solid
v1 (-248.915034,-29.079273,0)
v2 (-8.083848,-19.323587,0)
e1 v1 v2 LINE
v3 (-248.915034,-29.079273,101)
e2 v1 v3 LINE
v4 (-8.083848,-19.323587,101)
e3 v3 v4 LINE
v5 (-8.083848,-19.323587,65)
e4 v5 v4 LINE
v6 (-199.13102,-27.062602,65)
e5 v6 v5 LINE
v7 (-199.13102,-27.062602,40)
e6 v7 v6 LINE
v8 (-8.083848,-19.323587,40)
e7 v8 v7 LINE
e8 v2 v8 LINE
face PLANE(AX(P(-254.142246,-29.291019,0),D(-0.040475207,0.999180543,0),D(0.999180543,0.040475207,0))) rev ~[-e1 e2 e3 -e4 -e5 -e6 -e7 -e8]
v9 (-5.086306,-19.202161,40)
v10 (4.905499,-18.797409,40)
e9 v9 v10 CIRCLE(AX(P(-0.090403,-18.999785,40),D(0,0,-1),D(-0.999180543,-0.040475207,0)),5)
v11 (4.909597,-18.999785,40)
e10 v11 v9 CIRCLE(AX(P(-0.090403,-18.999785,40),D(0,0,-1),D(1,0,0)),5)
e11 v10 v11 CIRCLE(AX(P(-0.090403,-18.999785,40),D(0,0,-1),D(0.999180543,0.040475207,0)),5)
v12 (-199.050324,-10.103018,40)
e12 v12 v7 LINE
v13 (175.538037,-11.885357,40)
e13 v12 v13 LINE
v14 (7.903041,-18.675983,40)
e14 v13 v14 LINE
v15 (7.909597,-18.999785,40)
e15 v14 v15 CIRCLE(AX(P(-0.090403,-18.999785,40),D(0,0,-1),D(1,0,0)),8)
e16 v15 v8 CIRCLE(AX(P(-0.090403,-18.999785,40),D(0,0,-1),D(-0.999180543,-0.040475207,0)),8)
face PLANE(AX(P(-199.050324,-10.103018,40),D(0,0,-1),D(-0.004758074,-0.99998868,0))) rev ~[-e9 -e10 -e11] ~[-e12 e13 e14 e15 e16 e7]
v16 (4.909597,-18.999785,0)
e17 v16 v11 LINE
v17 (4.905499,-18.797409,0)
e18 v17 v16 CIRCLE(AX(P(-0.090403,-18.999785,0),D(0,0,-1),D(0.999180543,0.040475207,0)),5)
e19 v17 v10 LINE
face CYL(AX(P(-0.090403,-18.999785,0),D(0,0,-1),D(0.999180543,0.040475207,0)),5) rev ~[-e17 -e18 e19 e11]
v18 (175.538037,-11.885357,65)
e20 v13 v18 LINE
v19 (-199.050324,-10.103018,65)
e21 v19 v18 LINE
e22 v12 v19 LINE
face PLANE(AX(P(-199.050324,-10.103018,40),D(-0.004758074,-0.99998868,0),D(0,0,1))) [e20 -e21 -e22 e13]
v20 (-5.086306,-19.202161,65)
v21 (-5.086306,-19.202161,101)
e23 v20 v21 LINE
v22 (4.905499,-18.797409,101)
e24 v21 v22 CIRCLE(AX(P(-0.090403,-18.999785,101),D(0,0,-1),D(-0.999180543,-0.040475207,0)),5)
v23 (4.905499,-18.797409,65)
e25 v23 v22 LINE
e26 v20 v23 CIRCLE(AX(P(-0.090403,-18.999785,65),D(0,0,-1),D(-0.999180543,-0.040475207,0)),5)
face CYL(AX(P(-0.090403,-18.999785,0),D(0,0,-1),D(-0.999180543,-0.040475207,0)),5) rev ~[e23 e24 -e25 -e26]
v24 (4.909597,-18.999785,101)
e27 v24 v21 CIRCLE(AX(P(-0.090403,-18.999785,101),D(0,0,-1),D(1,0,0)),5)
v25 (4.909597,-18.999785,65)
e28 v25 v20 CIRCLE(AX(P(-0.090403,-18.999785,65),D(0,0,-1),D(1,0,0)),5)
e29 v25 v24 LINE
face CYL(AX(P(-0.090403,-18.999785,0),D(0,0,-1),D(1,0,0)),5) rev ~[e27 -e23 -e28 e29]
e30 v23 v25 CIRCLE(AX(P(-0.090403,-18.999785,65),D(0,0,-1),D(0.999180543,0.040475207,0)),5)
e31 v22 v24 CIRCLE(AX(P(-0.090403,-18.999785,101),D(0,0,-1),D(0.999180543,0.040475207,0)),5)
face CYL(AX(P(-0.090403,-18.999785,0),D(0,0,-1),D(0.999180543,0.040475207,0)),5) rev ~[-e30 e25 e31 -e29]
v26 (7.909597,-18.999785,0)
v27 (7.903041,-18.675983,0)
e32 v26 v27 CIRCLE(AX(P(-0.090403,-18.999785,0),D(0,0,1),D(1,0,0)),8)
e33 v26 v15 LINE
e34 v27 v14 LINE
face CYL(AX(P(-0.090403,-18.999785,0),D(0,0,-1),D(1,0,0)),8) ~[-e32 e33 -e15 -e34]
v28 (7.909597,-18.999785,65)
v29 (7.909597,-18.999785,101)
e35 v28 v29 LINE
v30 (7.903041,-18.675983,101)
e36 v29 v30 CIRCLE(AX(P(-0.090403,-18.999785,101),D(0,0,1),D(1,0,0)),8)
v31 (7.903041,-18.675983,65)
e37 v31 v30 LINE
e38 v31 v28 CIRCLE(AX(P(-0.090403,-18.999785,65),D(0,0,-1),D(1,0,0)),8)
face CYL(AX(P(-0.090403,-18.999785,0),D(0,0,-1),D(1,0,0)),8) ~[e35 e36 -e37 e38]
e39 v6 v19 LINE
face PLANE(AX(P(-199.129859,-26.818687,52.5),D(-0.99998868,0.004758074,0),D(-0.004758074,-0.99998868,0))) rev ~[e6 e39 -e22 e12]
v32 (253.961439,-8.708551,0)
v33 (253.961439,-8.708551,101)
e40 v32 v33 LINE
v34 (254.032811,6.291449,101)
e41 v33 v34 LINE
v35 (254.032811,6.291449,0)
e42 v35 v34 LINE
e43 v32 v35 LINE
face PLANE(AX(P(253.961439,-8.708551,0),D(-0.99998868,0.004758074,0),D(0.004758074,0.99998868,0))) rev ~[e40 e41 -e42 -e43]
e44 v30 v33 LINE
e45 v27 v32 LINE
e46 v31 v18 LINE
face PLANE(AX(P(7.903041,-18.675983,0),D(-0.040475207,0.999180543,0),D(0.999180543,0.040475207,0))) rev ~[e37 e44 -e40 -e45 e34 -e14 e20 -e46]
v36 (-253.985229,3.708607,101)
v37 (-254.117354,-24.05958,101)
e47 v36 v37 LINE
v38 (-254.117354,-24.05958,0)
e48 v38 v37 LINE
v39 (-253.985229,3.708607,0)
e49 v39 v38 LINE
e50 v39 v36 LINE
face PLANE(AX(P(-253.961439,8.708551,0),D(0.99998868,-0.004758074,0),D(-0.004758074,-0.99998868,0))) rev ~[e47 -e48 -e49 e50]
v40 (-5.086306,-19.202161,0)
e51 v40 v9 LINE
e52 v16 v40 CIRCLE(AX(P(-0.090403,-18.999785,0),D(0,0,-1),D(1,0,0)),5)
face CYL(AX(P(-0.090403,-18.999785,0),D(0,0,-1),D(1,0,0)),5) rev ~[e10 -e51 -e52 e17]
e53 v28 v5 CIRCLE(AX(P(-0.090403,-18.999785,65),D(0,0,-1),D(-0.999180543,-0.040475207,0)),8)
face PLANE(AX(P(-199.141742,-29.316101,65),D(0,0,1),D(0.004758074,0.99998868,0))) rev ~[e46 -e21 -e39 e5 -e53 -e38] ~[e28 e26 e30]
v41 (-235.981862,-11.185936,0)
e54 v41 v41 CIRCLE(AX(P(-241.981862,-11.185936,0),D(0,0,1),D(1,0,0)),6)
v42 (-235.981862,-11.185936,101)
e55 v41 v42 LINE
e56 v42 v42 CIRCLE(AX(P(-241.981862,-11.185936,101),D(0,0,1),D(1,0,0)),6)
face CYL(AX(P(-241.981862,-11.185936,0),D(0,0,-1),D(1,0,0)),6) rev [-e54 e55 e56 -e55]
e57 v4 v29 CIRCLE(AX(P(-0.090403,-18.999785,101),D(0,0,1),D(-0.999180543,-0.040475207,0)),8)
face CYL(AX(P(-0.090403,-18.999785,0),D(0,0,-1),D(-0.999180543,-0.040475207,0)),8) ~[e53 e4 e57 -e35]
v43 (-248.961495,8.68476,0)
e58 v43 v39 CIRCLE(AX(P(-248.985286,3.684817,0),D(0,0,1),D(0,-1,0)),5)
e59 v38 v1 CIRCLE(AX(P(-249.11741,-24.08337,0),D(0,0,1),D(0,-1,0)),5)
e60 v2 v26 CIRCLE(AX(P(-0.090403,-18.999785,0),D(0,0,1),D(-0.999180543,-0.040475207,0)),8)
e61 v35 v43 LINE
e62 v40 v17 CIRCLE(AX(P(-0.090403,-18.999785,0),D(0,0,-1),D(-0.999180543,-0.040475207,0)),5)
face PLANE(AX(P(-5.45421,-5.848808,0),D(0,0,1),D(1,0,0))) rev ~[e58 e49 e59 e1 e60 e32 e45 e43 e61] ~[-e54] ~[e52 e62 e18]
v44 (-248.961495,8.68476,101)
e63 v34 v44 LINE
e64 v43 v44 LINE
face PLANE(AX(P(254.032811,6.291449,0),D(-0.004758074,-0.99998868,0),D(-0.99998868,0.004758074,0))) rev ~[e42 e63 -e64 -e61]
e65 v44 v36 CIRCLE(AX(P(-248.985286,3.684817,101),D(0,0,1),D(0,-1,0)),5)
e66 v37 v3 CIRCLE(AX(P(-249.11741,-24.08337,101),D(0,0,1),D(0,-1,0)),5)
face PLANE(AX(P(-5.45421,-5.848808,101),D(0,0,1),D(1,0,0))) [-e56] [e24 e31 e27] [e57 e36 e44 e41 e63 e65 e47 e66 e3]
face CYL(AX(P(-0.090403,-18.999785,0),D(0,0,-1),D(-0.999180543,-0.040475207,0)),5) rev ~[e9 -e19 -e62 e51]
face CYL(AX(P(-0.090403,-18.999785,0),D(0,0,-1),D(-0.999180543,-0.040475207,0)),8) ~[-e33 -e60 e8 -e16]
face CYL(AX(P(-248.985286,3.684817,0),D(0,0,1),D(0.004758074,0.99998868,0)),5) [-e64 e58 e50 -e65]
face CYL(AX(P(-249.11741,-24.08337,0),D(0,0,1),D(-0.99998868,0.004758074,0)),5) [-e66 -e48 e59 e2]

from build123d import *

# Parameters (mm, degrees)
F0_R     = 6
F1_DEPTH = 101
F2_R     = 5
F4_START = -55
F3_W     = 4.994883243
F3_H     = 25
F3_W_2   = 5.9151866052
F3_W_3   = 8.303230216
F4_DEPTH = 453


# Not quite as in the source:
# - a feature names something its author has since deleted; it is built from what else it names


with BuildPart() as f1:
    # F0 (on Top) → F1 (new body)
    with BuildSketch(Plane.XY):
        with BuildLine():
            Line((254.0328107559, 6.2914491919), (-253.9614388373, 8.7085508081))
            Line((-253.9614388373, 8.7085508081), (-254.1422456511, -29.2910190433))
            Line((-254.1422456511, -29.2910190433), (-8.0838477514, -19.3235865814))
            ThreePointArc((-8.0838477514, -19.3235865814), (-0.4142050626, -11.0063405813), (7.9030409375, -18.67598327))
            Line((7.9030409375, -18.67598327), (253.9614388373, -8.7085508081))
            Line((253.9614388373, -8.7085508081), (254.0328107559, 6.2914491919))
        make_face()
        with Locations((-241.9818616233, -11.1859360032)):
            Circle(F0_R, mode=Mode.SUBTRACT)
        with BuildLine():
            ThreePointArc((7.9030409375, -18.67598327), (-0.4142050626, -11.0063405813), (-8.0838477514, -19.3235865814))
            Line((-8.0838477514, -19.3235865814), (-5.0863061222, -19.2021609605))
            ThreePointArc((-5.0863061222, -19.2021609605), (-0.2927794417, -14.0038822105), (4.9054993084, -18.7974088909))
            Line((4.9054993084, -18.7974088909), (7.9030409375, -18.67598327))
        make_face()
        with BuildLine():
            Line((-5.0863061222, -19.2021609605), (-8.0838477514, -19.3235865814))
            ThreePointArc((-8.0838477514, -19.3235865814), (0.0715305988, -26.9981458439), (7.9095965931, -18.9997849257))
            ThreePointArc((7.9095965931, -18.9997849257), (7.9079575113, -18.83785092), (7.9030409375, -18.67598327))
            Line((7.9030409375, -18.67598327), (4.9054993084, -18.7974088909))
            ThreePointArc((4.9054993084, -18.7974088909), (4.908572167, -18.8985761721), (4.9095965931, -18.9997849257))
            ThreePointArc((4.9095965931, -18.9997849257), (0.0108053467, -23.9987604996), (-5.0863061222, -19.2021609605))
        make_face()
    extrude(amount=F1_DEPTH)

    # F2
    f2_edges = [f1.edges().sort_by_distance(p)[0] for p in [
        (-254.142246, -29.291019, 50.5),
        (-253.961439, 8.708551, 50.5),
    ]]
    fillet(f2_edges, radius=F2_R)

    # F3 (on face) → F4 (cut)
    with BuildSketch(Plane(origin=(-253.9971247966, 1.2085508081, 0), x_dir=(-0.004758074, -0.9999886803, 0), z_dir=(-0.9999886803, 0.004758074, 0)).offset(F4_START)):
        with Locations((27.7658584427, 52.5)):
            Rectangle(F3_W, F3_H)
        with Locations((22.3108235186, 52.5)):
            Rectangle(F3_W_2, F3_H)
        with Locations((15.201615108, 52.5)):
            Rectangle(F3_W_3, F3_H)
    extrude(amount=-F4_DEPTH, mode=Mode.SUBTRACT)


solid = f1.part
